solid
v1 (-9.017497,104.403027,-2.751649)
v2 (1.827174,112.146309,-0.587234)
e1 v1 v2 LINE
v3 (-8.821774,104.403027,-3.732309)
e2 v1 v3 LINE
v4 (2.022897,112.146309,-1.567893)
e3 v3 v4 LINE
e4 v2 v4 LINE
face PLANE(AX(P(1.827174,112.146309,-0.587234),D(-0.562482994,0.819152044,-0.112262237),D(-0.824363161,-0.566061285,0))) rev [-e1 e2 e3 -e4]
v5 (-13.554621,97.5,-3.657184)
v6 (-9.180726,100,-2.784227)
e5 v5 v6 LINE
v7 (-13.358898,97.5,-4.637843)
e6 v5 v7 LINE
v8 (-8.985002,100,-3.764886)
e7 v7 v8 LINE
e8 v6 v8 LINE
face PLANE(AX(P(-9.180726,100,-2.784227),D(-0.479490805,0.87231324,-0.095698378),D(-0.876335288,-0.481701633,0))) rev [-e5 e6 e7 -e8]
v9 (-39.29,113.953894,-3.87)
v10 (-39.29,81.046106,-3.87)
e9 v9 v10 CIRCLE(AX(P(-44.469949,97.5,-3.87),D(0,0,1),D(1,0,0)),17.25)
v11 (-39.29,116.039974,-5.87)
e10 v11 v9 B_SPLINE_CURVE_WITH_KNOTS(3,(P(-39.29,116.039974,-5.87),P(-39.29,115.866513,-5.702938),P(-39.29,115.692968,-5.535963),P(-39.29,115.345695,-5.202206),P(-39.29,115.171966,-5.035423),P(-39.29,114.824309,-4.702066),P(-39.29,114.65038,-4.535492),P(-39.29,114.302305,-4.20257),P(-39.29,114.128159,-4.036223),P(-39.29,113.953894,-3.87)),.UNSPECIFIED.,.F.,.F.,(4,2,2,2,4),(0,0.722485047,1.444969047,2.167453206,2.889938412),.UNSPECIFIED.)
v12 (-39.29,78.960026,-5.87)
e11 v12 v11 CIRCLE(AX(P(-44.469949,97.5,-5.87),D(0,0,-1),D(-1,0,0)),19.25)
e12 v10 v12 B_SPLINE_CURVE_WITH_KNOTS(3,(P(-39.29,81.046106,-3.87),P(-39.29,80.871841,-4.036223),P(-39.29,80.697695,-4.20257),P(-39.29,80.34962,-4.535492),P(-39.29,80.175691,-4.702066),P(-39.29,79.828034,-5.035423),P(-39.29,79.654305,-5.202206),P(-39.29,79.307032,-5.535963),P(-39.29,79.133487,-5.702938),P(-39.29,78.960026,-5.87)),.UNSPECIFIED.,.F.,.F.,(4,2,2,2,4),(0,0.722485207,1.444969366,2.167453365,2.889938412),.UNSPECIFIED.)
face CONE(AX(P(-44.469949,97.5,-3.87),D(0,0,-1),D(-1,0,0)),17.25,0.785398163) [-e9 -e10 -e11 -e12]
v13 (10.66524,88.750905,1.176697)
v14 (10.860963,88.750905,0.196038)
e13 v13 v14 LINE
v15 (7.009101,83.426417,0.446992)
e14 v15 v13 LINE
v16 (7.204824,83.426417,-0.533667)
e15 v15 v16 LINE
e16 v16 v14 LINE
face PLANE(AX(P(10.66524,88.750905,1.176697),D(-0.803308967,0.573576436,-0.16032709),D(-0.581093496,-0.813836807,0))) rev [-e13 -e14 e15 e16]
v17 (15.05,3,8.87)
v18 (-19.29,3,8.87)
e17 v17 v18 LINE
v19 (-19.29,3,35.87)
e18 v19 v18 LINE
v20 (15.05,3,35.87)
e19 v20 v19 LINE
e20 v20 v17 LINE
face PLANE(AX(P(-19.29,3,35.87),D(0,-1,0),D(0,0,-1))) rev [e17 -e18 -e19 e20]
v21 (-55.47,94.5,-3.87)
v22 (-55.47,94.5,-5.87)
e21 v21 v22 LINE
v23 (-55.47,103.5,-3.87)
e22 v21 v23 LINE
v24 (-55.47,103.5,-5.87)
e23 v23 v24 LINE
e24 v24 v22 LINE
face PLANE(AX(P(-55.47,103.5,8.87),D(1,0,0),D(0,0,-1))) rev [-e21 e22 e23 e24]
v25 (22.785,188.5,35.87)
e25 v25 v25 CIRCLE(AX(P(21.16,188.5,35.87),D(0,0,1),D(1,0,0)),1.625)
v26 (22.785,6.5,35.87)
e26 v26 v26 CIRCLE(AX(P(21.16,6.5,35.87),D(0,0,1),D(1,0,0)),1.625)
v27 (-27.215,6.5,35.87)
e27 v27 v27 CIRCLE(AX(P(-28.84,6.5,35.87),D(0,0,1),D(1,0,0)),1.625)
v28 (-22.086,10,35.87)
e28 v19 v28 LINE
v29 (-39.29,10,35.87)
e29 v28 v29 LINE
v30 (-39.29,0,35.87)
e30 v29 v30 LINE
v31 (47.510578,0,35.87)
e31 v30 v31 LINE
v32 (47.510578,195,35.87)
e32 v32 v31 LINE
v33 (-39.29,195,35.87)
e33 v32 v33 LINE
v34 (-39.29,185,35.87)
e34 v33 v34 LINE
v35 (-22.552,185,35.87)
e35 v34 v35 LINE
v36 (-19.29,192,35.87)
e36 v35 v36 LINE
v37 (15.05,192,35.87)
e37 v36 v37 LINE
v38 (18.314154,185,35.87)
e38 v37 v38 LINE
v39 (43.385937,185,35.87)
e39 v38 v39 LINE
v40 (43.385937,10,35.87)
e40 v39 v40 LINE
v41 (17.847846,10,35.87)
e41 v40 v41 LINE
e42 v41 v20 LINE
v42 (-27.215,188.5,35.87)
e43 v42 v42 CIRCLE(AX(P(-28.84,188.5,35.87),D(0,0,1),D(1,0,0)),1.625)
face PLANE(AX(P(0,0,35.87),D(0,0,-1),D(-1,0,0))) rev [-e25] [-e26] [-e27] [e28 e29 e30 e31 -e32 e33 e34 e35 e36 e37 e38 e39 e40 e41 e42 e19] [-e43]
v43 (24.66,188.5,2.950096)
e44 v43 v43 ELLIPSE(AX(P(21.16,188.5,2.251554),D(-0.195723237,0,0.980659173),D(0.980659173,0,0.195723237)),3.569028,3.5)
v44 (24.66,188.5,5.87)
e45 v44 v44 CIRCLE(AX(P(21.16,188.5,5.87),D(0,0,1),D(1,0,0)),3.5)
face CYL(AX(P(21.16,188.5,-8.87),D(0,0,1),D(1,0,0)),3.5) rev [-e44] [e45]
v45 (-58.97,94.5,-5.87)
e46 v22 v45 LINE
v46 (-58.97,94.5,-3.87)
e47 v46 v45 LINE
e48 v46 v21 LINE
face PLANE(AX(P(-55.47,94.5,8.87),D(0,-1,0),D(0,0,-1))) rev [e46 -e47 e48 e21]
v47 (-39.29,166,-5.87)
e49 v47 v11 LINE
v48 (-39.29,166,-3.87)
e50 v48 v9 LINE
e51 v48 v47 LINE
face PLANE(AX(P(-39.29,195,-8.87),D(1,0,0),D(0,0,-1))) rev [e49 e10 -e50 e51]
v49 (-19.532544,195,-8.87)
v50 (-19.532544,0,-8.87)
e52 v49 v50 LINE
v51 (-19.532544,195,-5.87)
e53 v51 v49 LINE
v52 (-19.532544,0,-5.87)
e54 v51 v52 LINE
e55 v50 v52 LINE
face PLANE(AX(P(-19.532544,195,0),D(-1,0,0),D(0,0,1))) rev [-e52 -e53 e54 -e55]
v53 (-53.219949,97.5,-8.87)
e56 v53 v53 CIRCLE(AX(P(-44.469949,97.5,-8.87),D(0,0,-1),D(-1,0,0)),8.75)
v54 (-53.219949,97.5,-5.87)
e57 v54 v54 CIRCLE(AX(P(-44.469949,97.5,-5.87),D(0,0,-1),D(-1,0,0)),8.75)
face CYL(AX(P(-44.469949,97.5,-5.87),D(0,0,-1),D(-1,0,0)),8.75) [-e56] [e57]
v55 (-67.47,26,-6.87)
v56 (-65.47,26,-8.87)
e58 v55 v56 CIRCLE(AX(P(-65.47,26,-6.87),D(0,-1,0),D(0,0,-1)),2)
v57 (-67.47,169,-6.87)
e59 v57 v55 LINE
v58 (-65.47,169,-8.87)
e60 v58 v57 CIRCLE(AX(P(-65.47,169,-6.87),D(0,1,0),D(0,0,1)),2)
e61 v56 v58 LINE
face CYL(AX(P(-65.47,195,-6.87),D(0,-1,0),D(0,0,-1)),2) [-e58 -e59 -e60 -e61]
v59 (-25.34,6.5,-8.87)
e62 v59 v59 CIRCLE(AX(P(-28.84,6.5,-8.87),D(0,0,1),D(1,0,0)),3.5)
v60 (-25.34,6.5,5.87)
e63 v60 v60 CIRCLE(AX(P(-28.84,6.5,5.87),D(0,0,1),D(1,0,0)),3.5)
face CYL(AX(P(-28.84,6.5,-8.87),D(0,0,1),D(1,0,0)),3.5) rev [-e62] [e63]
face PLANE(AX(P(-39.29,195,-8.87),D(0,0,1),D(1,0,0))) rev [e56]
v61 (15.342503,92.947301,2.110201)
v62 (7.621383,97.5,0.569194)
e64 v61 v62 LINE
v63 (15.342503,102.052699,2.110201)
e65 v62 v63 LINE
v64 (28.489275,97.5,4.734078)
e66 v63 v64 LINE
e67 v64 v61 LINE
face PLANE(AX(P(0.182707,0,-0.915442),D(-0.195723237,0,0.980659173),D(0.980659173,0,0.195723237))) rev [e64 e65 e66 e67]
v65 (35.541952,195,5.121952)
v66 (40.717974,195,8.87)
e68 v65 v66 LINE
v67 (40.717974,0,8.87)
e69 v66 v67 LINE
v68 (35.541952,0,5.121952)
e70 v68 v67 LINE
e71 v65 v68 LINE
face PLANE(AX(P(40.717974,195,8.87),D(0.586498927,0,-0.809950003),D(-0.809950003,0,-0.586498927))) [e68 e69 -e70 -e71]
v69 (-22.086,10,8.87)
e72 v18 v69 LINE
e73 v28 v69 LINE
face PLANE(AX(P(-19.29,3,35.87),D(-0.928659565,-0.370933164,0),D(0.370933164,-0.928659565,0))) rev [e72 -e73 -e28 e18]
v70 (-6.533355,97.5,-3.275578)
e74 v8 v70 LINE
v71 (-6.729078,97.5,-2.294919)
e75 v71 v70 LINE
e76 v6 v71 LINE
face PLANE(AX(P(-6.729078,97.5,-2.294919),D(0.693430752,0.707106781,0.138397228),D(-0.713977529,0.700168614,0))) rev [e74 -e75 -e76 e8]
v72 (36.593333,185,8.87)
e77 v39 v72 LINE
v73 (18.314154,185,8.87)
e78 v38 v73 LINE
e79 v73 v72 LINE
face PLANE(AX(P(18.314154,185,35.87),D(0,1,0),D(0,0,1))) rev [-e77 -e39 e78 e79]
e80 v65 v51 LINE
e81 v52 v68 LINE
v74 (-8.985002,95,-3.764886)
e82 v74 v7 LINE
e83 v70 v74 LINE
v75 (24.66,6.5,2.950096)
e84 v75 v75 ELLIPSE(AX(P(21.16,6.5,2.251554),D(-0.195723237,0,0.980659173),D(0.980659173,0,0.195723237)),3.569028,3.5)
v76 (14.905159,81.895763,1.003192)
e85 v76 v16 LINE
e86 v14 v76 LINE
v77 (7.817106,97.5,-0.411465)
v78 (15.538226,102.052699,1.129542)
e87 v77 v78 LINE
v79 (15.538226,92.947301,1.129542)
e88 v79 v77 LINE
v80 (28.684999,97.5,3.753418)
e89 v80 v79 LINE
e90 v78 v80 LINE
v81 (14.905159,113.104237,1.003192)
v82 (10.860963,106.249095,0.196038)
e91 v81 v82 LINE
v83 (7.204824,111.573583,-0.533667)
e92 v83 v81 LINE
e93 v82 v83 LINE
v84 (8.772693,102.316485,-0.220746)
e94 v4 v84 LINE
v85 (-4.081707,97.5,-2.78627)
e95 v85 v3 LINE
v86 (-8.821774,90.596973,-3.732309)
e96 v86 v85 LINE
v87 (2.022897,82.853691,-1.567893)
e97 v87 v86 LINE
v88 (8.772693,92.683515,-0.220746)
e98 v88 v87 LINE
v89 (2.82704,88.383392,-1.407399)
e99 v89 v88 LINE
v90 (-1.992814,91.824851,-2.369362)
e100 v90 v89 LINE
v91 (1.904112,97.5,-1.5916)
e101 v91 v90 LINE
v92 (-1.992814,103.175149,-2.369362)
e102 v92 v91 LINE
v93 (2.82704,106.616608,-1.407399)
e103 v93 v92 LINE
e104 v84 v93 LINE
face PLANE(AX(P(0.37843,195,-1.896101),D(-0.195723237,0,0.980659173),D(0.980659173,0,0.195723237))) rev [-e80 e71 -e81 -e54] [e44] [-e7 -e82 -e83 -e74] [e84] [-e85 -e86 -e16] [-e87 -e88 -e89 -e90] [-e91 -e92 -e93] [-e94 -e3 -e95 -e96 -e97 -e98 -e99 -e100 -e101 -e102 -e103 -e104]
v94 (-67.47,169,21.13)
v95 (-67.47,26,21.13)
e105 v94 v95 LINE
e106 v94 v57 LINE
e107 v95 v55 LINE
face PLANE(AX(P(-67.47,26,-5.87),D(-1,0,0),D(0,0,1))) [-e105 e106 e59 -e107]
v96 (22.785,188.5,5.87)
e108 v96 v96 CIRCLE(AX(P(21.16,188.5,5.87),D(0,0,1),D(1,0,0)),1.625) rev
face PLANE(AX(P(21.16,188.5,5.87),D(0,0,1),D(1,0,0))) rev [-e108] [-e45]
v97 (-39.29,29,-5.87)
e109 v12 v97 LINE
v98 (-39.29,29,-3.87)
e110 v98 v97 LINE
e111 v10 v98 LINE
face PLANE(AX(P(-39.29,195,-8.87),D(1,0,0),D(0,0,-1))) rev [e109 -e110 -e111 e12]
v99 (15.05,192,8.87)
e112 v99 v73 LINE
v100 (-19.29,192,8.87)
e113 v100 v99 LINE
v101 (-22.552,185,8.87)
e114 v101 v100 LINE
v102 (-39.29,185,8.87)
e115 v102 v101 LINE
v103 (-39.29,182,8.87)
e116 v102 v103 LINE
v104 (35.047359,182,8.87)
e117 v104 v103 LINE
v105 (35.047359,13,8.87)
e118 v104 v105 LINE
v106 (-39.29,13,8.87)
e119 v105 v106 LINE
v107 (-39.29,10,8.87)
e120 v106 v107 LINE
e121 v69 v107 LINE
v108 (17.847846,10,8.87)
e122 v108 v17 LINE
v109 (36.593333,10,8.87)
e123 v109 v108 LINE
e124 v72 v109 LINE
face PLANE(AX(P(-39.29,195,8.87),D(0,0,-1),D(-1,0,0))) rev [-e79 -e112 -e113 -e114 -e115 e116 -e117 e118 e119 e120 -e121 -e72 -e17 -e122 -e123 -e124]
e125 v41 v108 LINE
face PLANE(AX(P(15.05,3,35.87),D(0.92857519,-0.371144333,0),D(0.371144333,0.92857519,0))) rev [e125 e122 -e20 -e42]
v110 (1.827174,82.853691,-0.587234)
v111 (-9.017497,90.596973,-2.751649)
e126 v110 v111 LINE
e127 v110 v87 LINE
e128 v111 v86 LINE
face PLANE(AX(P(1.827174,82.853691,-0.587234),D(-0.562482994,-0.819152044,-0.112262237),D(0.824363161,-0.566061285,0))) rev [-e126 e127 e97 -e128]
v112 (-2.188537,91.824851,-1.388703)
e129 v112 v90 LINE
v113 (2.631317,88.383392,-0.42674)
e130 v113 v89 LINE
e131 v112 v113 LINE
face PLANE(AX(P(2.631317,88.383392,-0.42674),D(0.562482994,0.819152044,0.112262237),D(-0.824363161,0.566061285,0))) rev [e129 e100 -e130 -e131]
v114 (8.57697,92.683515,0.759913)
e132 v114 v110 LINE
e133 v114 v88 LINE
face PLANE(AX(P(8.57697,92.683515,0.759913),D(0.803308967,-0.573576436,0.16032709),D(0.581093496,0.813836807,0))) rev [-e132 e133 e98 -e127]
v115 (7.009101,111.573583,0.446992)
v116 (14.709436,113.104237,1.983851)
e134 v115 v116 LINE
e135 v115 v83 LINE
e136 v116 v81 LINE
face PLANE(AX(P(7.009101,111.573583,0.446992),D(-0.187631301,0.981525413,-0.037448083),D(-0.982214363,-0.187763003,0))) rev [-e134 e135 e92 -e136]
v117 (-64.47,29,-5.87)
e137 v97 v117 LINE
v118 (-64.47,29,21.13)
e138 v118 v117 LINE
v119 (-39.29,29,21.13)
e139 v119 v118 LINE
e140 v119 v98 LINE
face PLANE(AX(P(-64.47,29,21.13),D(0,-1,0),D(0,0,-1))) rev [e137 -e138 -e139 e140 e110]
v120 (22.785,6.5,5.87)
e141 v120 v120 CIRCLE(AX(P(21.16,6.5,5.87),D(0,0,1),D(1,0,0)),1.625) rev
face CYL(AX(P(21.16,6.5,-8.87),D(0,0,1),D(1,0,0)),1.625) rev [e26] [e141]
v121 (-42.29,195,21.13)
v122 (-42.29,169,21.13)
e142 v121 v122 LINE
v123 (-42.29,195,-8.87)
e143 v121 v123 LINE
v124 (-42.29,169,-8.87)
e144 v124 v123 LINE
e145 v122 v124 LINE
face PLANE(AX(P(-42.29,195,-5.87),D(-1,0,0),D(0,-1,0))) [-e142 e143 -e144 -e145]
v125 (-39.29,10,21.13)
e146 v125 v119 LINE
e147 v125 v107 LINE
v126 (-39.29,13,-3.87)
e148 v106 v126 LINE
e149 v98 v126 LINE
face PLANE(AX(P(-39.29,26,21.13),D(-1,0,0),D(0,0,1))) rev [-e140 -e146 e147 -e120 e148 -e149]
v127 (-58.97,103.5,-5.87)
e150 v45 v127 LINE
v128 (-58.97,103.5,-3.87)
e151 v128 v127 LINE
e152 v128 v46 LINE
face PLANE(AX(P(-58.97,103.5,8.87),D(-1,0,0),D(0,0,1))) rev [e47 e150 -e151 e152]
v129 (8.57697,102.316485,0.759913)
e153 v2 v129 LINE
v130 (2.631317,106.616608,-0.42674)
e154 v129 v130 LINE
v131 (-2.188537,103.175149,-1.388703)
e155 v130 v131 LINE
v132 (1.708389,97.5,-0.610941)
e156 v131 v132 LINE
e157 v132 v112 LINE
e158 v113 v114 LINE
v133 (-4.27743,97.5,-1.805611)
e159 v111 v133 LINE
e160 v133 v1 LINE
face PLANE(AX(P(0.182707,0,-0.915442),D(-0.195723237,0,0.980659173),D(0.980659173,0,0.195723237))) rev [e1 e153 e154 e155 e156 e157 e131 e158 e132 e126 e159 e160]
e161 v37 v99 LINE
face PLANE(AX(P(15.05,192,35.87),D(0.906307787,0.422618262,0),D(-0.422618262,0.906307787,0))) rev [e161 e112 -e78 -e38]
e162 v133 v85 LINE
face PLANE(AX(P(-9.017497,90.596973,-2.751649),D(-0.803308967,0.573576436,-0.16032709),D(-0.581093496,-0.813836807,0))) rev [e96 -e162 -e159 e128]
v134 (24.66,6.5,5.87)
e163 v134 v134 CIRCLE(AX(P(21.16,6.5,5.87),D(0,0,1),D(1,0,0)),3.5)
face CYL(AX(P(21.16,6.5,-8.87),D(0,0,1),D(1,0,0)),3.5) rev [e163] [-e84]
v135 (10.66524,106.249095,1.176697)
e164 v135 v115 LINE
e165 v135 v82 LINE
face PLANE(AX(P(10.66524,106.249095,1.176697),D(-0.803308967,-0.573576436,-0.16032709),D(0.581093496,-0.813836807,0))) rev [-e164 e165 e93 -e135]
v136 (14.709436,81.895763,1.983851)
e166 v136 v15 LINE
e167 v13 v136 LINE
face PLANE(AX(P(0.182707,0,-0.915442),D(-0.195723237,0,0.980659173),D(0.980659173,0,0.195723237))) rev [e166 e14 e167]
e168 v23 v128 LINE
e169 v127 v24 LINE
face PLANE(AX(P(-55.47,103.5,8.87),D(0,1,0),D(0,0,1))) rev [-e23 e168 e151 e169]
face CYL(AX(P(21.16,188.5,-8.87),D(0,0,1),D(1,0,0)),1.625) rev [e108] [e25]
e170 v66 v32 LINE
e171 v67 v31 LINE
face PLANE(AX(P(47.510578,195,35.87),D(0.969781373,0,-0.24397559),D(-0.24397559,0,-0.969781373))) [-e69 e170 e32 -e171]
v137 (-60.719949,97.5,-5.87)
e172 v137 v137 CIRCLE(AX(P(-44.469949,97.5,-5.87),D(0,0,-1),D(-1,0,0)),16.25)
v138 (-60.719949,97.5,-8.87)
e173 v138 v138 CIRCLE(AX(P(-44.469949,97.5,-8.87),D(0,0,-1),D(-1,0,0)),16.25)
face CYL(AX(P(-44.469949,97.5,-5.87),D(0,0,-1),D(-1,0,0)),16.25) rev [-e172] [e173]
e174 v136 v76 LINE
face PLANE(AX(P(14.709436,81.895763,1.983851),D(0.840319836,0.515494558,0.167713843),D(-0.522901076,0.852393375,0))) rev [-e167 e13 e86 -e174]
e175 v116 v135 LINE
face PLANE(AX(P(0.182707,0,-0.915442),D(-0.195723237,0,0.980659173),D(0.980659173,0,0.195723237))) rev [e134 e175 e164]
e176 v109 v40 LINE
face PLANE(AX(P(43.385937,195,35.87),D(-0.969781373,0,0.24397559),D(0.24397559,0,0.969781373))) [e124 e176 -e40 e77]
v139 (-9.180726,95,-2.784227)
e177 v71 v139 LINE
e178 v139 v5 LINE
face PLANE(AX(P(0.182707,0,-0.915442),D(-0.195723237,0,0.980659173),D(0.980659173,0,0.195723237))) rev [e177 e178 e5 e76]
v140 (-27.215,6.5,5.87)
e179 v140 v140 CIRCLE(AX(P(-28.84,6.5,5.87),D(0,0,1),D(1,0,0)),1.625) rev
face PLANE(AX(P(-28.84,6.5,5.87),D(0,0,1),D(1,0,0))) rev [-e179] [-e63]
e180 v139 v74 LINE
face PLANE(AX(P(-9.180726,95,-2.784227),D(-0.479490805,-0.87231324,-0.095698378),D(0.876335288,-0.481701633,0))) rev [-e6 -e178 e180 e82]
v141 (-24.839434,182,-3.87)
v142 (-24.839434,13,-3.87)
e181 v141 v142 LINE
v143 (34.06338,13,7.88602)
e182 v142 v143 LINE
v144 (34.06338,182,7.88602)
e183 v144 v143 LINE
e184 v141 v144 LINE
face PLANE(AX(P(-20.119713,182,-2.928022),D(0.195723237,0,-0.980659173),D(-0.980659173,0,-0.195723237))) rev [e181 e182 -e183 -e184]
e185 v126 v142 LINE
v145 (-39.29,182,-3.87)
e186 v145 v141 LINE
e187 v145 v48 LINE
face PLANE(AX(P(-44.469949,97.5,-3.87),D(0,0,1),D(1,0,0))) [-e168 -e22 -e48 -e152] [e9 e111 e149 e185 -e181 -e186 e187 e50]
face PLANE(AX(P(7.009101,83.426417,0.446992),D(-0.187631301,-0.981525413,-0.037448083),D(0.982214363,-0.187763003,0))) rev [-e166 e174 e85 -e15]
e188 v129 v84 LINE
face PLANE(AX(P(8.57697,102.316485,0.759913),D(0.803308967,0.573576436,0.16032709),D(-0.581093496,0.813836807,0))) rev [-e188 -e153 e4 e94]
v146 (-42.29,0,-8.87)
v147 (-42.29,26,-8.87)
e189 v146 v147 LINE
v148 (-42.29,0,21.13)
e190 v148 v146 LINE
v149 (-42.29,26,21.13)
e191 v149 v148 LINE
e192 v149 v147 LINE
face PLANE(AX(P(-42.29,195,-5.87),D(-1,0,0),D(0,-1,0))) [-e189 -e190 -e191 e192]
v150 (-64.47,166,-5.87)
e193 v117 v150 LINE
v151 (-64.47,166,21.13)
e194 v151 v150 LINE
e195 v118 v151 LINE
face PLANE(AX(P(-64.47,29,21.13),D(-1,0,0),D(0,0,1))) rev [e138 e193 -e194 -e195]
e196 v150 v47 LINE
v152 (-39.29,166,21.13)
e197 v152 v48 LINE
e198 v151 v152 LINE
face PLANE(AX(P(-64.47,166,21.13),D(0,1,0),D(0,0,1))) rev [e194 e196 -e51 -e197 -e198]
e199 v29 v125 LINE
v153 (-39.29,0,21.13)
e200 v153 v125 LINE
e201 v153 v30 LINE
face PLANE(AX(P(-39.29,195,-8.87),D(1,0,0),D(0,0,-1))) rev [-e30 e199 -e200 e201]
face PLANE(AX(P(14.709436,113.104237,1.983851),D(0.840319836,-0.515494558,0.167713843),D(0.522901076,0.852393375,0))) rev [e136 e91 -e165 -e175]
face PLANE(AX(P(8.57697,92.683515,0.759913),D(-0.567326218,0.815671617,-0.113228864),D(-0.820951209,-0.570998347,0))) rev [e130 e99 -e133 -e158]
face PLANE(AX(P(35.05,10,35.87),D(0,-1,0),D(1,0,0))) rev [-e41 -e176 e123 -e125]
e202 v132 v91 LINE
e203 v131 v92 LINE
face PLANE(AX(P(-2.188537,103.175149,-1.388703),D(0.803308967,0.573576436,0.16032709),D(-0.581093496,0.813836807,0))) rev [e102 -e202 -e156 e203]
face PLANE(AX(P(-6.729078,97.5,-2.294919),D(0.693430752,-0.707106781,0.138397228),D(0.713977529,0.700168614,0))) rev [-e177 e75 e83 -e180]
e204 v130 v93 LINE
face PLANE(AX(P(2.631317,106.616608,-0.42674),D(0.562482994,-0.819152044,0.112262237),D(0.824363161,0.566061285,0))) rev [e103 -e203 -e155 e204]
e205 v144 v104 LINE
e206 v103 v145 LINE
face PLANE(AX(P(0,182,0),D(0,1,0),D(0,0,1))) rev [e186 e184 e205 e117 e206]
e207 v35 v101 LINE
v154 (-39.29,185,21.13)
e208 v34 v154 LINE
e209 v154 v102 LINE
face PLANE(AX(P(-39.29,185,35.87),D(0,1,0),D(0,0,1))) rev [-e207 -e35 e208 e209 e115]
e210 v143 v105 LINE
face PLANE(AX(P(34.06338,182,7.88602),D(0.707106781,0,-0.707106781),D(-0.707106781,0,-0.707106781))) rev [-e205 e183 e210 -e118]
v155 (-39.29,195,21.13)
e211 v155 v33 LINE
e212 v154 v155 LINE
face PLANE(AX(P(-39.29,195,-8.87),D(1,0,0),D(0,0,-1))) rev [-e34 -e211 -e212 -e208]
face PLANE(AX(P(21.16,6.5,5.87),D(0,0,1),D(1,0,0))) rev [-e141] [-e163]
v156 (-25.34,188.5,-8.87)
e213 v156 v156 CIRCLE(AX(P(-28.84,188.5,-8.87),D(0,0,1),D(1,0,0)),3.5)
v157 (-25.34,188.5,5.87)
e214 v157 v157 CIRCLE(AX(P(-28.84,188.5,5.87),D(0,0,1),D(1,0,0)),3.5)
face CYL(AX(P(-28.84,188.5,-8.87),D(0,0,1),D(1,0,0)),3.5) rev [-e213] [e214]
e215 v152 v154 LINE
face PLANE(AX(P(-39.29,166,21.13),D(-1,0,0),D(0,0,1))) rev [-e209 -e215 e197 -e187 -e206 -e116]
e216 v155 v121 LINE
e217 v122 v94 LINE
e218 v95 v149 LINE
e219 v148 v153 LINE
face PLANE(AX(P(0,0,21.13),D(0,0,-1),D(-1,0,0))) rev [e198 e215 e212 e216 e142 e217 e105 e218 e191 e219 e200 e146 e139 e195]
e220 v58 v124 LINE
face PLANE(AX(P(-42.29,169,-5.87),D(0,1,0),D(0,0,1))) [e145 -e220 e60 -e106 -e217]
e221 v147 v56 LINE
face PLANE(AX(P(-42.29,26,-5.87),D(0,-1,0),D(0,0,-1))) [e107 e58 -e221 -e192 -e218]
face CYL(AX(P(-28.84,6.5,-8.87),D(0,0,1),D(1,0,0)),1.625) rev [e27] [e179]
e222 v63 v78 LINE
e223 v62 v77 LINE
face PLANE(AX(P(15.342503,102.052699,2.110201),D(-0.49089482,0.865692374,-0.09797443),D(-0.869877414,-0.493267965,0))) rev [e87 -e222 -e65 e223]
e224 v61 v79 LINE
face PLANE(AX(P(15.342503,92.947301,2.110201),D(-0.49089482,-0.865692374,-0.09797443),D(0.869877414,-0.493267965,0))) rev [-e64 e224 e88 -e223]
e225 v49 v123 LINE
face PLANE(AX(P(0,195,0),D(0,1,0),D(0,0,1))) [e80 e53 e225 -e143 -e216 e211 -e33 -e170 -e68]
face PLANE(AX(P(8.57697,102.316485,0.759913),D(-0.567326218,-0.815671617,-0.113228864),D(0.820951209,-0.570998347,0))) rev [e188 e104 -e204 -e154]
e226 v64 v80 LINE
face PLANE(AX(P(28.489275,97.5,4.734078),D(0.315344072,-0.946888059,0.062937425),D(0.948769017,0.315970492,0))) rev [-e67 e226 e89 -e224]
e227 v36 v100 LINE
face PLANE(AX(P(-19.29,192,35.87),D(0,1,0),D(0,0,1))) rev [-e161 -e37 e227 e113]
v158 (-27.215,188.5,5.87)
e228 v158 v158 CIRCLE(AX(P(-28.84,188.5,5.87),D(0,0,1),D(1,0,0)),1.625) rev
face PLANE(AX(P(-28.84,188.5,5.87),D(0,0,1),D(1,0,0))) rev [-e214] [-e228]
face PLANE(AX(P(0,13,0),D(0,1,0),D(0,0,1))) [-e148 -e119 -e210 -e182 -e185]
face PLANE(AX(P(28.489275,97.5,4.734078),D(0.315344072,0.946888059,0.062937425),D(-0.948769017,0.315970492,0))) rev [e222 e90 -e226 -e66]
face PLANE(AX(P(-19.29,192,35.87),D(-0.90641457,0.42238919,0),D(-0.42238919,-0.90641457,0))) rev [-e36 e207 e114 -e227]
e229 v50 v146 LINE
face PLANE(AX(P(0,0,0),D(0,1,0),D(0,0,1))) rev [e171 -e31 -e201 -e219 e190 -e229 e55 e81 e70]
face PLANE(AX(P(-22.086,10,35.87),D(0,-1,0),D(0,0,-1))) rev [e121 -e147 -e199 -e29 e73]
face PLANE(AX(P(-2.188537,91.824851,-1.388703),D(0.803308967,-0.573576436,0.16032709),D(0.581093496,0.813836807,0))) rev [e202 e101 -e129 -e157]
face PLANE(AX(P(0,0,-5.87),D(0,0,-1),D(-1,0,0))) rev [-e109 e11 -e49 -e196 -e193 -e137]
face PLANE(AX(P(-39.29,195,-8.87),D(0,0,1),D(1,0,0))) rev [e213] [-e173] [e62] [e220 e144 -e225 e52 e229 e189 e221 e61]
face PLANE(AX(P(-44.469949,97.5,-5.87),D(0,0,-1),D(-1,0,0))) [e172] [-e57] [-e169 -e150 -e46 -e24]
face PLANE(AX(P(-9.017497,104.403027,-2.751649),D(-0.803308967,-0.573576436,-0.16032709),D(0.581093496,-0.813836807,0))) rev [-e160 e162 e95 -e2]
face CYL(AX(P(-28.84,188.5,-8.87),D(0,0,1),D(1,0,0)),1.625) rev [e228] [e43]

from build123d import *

# Parameters (mm, degrees)
CROQUIS1_W                 = 78.58
CROQUIS1_H                 = 17.74
SALIENTE_EXTRUIR1_DEPTH    = 195
CORTAR_EXTRUIR1_DEPTH      = 200.116501074
CORTAR_EXTRUIR1_DEPTH_BACK = 200.116501074
CHAFL_N1_SIZE2             = 3.821967962
CHAFL_N1_SIZE              = 3
CROQUIS4_W                 = 3
CROQUIS4_H                 = 195
SALIENTE_EXTRUIR2_DEPTH    = 3
CROQUIS5_W                 = 25.18
CROQUIS5_H                 = 143
SALIENTE_EXTRUIR3_DEPTH    = 3
REDONDEO1_R                = 2
CORTAR_EXTRUIR2_DEPTH      = 208.103617786
CORTAR_EXTRUIR2_DEPTH_BACK = 208.103617786
CROQUIS6_R                 = 1.625
CORTAR_EXTRUIR3_START      = -3
CROQUIS7_R                 = 3.5
CORTAR_EXTRUIR3_DEPTH      = 205.103617786
CROQUIS8_R                 = 16.25
CROQUIS8_R_2               = 8.75
CORTAR_EXTRUIR4_DEPTH      = 3
CROQUIS9_R                 = 17.25
SALIENTE_EXTRUIR4_DEPTH    = 2
CHAFL_N2_SIZE              = 2
CORTAR_EXTRUIR6_DEPTH      = 208.103617786
CORTAR_EXTRUIR6_DEPTH_BACK = 208.103617786
CROQUIS10_W                = 3.5
CROQUIS10_H                = 9
CORTAR_EXTRUIR7_DEPTH      = 1
CORTAR_EXTRUIR8_START      = -13
CORTAR_EXTRUIR8_DEPTH      = 169
SALIENTE_EXTRUIR6_START    = 27
CROQUIS16_R                = 1.625
SALIENTE_EXTRUIR6_DEPTH    = 27
SALIENTE_EXTRUIR9_DEPTH    = 27
SALIENTE_EXTRUIR10_DEPTH   = 195
SALIENTE_EXTRUIR11_START   = -10
SALIENTE_EXTRUIR11_DEPTH   = 10
SALIENTE_EXTRUIR12_START   = -10
SALIENTE_EXTRUIR12_DEPTH   = 10


# Read off the part's stored shape, not the designer's step: Saliente-Extruir11, Saliente-Extruir12
with BuildPart() as part:
    # Croquis1 → Saliente-Extruir1 (new body)
    with BuildSketch(Plane(origin=(0, 0, 0), x_dir=(1, 0, 0), z_dir=(0, 1, 0))):
        Rectangle(CROQUIS1_W, CROQUIS1_H)
    extrude(amount=SALIENTE_EXTRUIR1_DEPTH)

    # Croquis2 → Cortar-Extruir1 (cut, two sides: drawn at the far end of the back side and taken through both)
    with BuildSketch(Plane.XZ.offset(-CORTAR_EXTRUIR1_DEPTH_BACK)):
        Polygon((39.29, 5.87), (-19.532543769, -5.87), (-19.532543769, -8.87), (39.29, -8.87), align=None)
    extrude(amount=CORTAR_EXTRUIR1_DEPTH + CORTAR_EXTRUIR1_DEPTH_BACK, mode=Mode.SUBTRACT)

    # Chaflán1
    chafl_n1_edges = [part.edges().sort_by_distance(p)[0] for p in [
        (39.29, 97.5, 5.87),
    ]]
    chafl_n1_side = [part.faces().sort_by_distance(p)[0] for p in [
        (39.29, 97.5, 5.93),
    ]]
    chamfer(chafl_n1_edges, length=CHAFL_N1_SIZE - 0.0001, length2=CHAFL_N1_SIZE2 - 0.0001, reference=chafl_n1_side[0])  # a hair under: the kernel refuses the full size

    # Croquis4 → Saliente-Extruir2 (add)
    with BuildSketch(Plane(origin=(0, 0, -8.87), x_dir=(-1, 0, 0), z_dir=(0, 0, -1))):
        with Locations((40.79, 97.5)):
            Rectangle(CROQUIS4_W, CROQUIS4_H)
    extrude(amount=-SALIENTE_EXTRUIR2_DEPTH)

    # Croquis5 → Saliente-Extruir3 (add)
    with BuildSketch(Plane(origin=(0, 0, -8.87), x_dir=(-1, 0, 0), z_dir=(0, 0, -1))):
        with Locations((54.88, 97.5)):
            Rectangle(CROQUIS5_W, CROQUIS5_H)
    extrude(amount=-SALIENTE_EXTRUIR3_DEPTH)

    # Redondeo1
    redondeo1_edges = [part.edges().sort_by_distance(p)[0] for p in [
        (-67.47, 97.5, -8.87),
    ]]
    fillet(redondeo1_edges, radius=REDONDEO1_R)

    # Croquis6 → Cortar-Extruir2 (cut, two sides: drawn at the far end of the back side and taken through both)
    with BuildSketch(Plane.XY.offset(8.87).offset(-CORTAR_EXTRUIR2_DEPTH_BACK)):
        with Locations((-28.84, 188.5)):
            Circle(CROQUIS6_R)
        with Locations((21.16, 188.5)):
            Circle(CROQUIS6_R)
        with Locations((21.16, 6.5)):
            Circle(CROQUIS6_R)
        with Locations(Location((-28.84, 6.5, 0), (0, 0, 180))):
            Circle(CROQUIS6_R)
    extrude(amount=CORTAR_EXTRUIR2_DEPTH + CORTAR_EXTRUIR2_DEPTH_BACK, mode=Mode.SUBTRACT)

    # Croquis7 → Cortar-Extruir3 (cut, through all)
    with BuildSketch(Plane.XY.offset(8.87).offset(CORTAR_EXTRUIR3_START)):
        with Locations((-28.84, 188.5)):
            Circle(CROQUIS7_R)
        with Locations((21.16, 188.5)):
            Circle(CROQUIS7_R)
        with Locations((-28.84, 6.5)):
            Circle(CROQUIS7_R)
        with Locations((21.16, 6.5)):
            Circle(CROQUIS7_R)
    extrude(amount=-CORTAR_EXTRUIR3_DEPTH, mode=Mode.SUBTRACT)

    # Croquis8 → Cortar-Extruir4 (cut)
    with BuildSketch(Plane(origin=(0, 0, -8.87), x_dir=(-1, 0, 0), z_dir=(0, 0, -1))):
        with Locations((44.469949206, 97.5)):
            Circle(CROQUIS8_R)
        with Locations((44.469949206, 97.5)):
            Circle(CROQUIS8_R_2, mode=Mode.SUBTRACT)
    extrude(amount=-CORTAR_EXTRUIR4_DEPTH, mode=Mode.SUBTRACT)

    # Croquis9 → Saliente-Extruir4 (add)
    with BuildSketch(Plane.XY.offset(-5.87)):
        with Locations((-44.469949206, 97.5)):
            Circle(CROQUIS9_R)
    extrude(amount=SALIENTE_EXTRUIR4_DEPTH)

    # Chaflán2
    chafl_n2_edges = [part.edges().sort_by_distance(p)[0] for p in [
        (-61.719949206, 97.5, -5.87),
    ]]
    chamfer(chafl_n2_edges, length=CHAFL_N2_SIZE - 0.0001)  # a hair under: the kernel refuses the full size

    # Croquis10 → Cortar-Extruir6 (cut, two sides: drawn at the far end of the back side and taken through both)
    with BuildSketch(Plane(origin=(0, 0, -8.87), x_dir=(-1, 0, 0), z_dir=(0, 0, -1)).offset(-CORTAR_EXTRUIR6_DEPTH_BACK)):
        with Locations((57.22, 99)):
            Rectangle(CROQUIS10_W, CROQUIS10_H)
    extrude(amount=CORTAR_EXTRUIR6_DEPTH + CORTAR_EXTRUIR6_DEPTH_BACK, mode=Mode.SUBTRACT)

    # Croquis11 → Cortar-Extruir7 (cut)
    with BuildSketch(Plane(origin=(0.378430223, 0, -1.896101224), x_dir=(-0.9806591733939511, 0, -0.1957232373487947), z_dir=(0.19572323734879468, 0, -0.980659173393951))):
        Polygon((-28.864838216, 97.5), (-15.458781877, 92.947300595), (-7.58538371, 97.5), (-15.458781877, 102.052699405), align=None)
        Polygon((-10.689272405, 88.750905342), (-6.961025568, 83.426417054), (-14.813228871, 81.895762524), align=None)
        Polygon((-8.5598171, 92.683515176), (-1.676899864, 82.853690645), (9.381652734, 90.596972535), (4.548100867, 97.5), (9.381652734, 104.403027465), (-1.676899864, 112.146309355), (-8.5598171, 102.316484824), (-2.496901935, 106.616608043), (2.418010331, 103.175149425), (-1.555772077, 97.5), (2.418010331, 91.824850575), (-2.496901935, 88.383391957), align=None)
        Polygon((7.048100867, 97.5), (9.548100867, 95), (14.008259291, 97.5), (9.548100867, 100), align=None)
        Polygon((-14.813228871, 113.104237476), (-10.689272405, 106.249094658), (-6.961025568, 111.573582946), align=None)
    extrude(amount=-CORTAR_EXTRUIR7_DEPTH, mode=Mode.SUBTRACT)

    # Croquis12 → Cortar-Extruir8 (cut)
    with BuildSketch(Plane.XZ.offset(CORTAR_EXTRUIR8_START)):
        Polygon((-20.119713481, -2.92802248), (-24.839433576, -3.87), (-39.29, -3.87), (-39.29, 8.87), (35.047359313, 8.87), (34.063379787, 7.886020474), align=None)
    extrude(amount=-CORTAR_EXTRUIR8_DEPTH, mode=Mode.SUBTRACT)

    # Croquis16 → Saliente-Extruir6 (add)
    # profile 1 of 2: a face of its own
    with BuildSketch(Plane.XY.offset(8.87).offset(SALIENTE_EXTRUIR6_START)):
        Polygon((15.05, 3), (17.847845949, 10), (35.05, 10), (35.05, 0), (15.05, 0), (-19.29, 0), (-39.29, 0), (-39.29, 10), (-22.086, 10), (-19.29, 3), align=None)
        with Locations((-28.84, 6.5)):
            Circle(CROQUIS16_R, mode=Mode.SUBTRACT)
        with Locations((21.16, 6.5)):
            Circle(CROQUIS16_R, mode=Mode.SUBTRACT)
    # profile 2 of 2: a face of its own
    with BuildSketch(Plane.XY.offset(8.87).offset(SALIENTE_EXTRUIR6_START)):
        Polygon((-39.29, 195), (-19.29, 195), (15.05, 195), (35.05, 195), (35.05, 185), (18.314153607, 185), (15.05, 192), (-19.29, 192), (-22.552, 185), (-39.29, 185), align=None)
        with Locations((-28.84, 188.5)):
            Circle(CROQUIS16_R, mode=Mode.SUBTRACT)
        with Locations((21.16, 188.5)):
            Circle(CROQUIS16_R, mode=Mode.SUBTRACT)
    extrude(amount=-SALIENTE_EXTRUIR6_DEPTH)

    # Croquis19 → Saliente-Extruir9 (add)
    with BuildSketch(Plane.XY.offset(-5.87)):
        Polygon((-42.29, 26), (-42.29, 0), (-39.29, 0), (-39.29, 26), (-39.29, 29), (-64.47, 29), (-64.47, 166), (-39.29, 166), (-39.29, 195), (-42.29, 195), (-42.29, 169), (-67.47, 169), (-67.47, 26), align=None)
    extrude(amount=SALIENTE_EXTRUIR9_DEPTH)

    # Croquis20 → Saliente-Extruir10 (add)
    with BuildSketch(Plane.XZ):
        Polygon((47.510578309, 35.87), (43.385937322, 35.87), (36.593333228, 8.87), (35.541952057, 5.121952057), (40.717974215, 8.87), align=None)
    extrude(amount=-SALIENTE_EXTRUIR10_DEPTH)

    # Saliente-Extruir11 outline → Saliente-Extruir11 (add)
    with BuildSketch(Plane.XZ.offset(SALIENTE_EXTRUIR11_START)):
        Polygon((36.593333228, 8.87), (43.385937322, 35.87), (35.05, 35.87), (35.05, 8.87), align=None)
    extrude(amount=SALIENTE_EXTRUIR11_DEPTH)

    # Saliente-Extruir12 outline → Saliente-Extruir12 (add)
    with BuildSketch(Plane(origin=(0, 195, 0), x_dir=(1, 0, 0), z_dir=(0, 1, 0)).offset(SALIENTE_EXTRUIR12_START)):
        Polygon((35.05, -35.87), (43.385937322, -35.87), (36.593333228, -8.87), (35.05, -8.87), align=None)
    extrude(amount=SALIENTE_EXTRUIR12_DEPTH)


solid = part.part
